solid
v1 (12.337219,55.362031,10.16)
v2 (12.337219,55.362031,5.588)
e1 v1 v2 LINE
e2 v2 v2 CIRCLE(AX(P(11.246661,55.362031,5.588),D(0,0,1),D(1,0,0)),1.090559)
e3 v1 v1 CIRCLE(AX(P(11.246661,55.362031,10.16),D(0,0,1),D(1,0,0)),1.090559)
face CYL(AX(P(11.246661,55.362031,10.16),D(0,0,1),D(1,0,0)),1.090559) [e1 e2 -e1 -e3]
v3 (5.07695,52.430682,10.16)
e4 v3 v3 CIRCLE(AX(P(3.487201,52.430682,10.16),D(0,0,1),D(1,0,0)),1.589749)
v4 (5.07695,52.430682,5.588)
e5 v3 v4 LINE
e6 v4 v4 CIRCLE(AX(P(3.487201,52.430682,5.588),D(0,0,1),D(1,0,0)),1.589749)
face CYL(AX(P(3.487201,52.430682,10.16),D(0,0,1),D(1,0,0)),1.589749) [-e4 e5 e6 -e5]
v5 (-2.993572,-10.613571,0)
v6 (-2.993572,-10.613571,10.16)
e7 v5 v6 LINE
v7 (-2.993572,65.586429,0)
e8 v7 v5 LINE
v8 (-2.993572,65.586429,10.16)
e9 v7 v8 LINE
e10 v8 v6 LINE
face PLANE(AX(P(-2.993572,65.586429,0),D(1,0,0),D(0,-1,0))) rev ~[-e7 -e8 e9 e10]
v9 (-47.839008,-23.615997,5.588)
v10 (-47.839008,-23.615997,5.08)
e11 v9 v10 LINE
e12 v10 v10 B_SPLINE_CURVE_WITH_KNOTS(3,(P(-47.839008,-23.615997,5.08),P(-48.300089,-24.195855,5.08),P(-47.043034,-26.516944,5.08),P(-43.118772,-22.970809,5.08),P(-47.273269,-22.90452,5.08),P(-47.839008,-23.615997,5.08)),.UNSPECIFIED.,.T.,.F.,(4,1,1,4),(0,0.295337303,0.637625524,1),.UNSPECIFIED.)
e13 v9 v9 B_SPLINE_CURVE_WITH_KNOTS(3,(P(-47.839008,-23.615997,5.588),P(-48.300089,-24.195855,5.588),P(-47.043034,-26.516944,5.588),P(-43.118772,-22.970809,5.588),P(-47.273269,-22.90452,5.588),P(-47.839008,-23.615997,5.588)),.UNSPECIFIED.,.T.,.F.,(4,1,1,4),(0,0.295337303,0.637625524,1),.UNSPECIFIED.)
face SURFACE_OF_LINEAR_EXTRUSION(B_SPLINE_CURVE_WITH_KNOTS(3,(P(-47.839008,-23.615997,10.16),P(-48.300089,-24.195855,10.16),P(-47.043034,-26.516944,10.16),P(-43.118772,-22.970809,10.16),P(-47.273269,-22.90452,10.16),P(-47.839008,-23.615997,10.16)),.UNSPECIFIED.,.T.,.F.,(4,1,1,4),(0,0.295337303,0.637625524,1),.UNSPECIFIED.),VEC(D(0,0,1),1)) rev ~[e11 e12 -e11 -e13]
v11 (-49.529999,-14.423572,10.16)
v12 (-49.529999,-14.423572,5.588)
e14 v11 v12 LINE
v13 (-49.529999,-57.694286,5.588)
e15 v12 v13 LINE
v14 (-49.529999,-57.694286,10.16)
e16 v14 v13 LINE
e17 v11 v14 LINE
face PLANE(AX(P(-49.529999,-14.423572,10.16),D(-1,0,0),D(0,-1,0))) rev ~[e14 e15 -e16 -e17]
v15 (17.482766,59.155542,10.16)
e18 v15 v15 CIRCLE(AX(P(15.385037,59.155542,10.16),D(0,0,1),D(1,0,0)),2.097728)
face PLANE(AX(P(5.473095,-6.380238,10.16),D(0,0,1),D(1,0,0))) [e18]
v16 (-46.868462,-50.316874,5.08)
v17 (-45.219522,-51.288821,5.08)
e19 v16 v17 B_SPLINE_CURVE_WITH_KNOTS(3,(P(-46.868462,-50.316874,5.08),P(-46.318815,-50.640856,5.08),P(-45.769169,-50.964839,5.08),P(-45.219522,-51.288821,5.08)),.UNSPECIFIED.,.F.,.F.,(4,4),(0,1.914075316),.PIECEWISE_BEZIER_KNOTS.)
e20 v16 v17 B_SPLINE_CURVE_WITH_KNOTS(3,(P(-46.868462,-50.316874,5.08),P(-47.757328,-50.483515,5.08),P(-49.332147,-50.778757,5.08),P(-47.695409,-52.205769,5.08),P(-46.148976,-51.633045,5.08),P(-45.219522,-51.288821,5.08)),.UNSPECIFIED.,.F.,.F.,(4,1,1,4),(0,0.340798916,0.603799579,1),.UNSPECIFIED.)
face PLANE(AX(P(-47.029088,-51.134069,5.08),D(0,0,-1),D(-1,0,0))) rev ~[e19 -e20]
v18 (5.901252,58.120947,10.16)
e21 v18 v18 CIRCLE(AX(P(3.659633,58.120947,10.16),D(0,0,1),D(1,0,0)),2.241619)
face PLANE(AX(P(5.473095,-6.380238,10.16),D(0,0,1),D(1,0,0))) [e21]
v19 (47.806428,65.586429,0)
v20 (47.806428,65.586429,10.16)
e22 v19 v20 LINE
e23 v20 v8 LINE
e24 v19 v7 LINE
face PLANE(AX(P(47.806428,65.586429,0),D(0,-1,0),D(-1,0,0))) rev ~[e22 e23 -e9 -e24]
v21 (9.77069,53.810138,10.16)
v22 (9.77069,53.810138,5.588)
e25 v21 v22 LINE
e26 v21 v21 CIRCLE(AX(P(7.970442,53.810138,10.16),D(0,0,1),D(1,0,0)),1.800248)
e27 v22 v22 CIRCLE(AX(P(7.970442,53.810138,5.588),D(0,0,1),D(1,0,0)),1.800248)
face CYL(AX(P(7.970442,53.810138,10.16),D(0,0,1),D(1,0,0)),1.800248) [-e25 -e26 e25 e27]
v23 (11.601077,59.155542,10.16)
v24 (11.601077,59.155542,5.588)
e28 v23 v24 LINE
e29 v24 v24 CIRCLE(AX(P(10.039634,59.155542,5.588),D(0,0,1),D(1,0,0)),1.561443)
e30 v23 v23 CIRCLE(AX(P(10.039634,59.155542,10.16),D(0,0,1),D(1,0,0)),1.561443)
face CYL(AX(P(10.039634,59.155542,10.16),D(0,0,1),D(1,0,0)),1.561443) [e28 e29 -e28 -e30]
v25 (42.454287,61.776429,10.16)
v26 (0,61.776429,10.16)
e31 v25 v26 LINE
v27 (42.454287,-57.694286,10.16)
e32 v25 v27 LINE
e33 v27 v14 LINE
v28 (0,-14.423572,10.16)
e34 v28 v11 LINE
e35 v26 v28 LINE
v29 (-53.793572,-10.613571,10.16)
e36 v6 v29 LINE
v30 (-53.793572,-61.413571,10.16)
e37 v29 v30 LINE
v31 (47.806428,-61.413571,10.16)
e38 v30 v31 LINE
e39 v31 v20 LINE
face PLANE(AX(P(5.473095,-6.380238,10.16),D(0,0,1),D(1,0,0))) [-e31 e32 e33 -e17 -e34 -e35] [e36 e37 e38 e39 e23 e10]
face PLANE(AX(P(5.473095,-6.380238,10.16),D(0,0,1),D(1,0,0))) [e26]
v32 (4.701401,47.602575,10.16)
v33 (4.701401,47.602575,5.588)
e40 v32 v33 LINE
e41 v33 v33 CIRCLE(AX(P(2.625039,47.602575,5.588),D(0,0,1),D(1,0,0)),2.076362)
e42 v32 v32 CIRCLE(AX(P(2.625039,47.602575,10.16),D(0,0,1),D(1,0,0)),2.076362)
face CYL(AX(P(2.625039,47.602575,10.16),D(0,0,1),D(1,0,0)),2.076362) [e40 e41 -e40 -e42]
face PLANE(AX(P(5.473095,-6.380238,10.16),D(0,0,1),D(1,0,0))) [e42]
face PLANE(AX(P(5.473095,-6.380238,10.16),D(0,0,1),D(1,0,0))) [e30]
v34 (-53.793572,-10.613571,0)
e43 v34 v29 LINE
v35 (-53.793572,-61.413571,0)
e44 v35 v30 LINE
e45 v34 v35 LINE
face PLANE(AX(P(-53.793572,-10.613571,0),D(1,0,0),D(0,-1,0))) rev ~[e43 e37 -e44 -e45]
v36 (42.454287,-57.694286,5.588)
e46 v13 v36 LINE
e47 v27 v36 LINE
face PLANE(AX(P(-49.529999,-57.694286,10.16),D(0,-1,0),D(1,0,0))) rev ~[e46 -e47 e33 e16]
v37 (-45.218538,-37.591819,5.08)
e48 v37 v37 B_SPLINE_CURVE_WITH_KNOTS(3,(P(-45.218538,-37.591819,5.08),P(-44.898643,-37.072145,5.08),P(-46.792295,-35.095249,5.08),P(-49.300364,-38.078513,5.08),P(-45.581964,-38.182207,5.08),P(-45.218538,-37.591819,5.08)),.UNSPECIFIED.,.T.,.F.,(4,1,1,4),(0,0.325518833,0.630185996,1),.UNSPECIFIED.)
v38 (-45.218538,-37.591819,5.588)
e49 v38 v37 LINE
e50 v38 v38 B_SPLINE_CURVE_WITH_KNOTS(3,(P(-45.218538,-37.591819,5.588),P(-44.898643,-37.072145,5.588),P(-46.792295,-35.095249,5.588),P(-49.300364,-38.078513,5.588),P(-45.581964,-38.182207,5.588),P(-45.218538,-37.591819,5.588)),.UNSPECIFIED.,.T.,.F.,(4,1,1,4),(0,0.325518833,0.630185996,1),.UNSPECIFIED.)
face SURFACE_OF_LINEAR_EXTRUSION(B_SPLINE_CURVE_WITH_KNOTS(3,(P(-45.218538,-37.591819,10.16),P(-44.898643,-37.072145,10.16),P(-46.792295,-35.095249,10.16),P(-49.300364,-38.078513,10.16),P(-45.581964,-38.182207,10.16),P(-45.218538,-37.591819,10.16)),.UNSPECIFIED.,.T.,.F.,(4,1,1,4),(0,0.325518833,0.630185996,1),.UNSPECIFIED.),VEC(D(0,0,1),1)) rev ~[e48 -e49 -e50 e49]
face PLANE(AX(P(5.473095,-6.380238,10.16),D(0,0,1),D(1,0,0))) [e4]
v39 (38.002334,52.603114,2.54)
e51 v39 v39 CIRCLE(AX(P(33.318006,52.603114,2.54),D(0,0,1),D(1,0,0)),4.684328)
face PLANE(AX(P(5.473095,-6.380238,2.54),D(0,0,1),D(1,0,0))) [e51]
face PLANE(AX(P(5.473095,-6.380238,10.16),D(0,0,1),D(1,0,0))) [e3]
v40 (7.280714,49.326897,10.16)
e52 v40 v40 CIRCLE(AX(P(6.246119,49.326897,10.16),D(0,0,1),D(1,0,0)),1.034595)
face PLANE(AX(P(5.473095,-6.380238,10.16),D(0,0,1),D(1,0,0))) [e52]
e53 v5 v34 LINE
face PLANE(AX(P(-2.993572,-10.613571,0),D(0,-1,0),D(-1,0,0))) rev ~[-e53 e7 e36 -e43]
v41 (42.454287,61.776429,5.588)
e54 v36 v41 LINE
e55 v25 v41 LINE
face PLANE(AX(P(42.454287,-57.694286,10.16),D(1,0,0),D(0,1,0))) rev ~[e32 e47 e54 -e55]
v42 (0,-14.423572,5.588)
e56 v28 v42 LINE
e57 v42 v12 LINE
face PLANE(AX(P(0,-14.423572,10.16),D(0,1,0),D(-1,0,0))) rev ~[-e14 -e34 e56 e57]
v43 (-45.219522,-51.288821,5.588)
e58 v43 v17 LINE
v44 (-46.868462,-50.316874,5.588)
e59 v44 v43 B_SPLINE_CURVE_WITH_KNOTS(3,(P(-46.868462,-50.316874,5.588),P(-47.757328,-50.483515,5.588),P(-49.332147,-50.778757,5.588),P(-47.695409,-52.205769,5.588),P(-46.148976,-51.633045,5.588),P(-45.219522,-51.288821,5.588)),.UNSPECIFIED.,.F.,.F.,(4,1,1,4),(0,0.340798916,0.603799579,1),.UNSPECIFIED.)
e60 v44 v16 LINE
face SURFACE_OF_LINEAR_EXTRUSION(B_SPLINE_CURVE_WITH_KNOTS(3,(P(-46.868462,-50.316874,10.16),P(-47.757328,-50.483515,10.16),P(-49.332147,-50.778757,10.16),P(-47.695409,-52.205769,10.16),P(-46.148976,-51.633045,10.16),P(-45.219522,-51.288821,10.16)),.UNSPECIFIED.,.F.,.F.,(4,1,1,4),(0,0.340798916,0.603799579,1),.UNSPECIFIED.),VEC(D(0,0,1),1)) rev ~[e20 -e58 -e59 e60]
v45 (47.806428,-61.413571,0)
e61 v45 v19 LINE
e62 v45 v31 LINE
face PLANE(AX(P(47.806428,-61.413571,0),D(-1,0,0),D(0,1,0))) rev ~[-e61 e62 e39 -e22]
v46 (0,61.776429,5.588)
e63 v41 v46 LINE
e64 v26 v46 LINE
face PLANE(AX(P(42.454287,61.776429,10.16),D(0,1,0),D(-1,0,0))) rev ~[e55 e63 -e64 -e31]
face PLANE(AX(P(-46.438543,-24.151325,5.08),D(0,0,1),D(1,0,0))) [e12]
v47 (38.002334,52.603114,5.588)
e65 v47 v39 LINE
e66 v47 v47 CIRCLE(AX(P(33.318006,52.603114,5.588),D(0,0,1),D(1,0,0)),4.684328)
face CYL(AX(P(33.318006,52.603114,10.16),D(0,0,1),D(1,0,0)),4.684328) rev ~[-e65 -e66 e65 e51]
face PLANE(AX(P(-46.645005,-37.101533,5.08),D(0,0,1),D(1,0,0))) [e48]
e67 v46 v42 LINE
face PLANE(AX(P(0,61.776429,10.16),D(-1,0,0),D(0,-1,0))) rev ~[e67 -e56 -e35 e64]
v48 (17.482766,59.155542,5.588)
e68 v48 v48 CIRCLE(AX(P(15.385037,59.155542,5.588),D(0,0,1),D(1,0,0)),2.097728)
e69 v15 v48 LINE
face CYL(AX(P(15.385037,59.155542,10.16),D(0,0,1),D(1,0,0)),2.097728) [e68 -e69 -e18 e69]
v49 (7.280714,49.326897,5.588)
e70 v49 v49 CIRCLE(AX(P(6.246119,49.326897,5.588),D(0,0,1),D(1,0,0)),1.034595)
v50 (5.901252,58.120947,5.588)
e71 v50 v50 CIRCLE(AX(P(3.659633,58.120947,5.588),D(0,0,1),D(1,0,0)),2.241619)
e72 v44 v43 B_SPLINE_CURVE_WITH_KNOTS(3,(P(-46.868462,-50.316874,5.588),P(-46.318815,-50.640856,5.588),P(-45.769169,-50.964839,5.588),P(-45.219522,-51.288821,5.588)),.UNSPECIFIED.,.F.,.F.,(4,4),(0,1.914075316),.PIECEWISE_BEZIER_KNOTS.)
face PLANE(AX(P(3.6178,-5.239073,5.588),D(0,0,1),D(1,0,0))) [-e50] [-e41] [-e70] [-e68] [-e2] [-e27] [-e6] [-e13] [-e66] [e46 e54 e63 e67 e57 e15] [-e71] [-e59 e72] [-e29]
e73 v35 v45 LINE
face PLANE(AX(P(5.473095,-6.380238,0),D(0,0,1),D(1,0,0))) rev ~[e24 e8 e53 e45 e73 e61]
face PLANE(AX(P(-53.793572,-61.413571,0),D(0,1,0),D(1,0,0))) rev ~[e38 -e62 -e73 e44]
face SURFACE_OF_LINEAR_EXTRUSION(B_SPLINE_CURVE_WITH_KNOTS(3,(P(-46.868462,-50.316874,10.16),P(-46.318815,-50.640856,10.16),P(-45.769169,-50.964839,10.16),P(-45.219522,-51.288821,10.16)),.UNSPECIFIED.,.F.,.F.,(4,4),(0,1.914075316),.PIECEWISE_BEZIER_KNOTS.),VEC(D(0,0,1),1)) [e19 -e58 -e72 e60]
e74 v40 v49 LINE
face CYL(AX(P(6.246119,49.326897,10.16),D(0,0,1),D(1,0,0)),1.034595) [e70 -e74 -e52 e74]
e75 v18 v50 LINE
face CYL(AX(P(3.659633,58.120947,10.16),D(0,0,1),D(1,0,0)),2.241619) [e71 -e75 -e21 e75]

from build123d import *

# Parameters (mm, degrees)
F1_DEPTH = 10.16
F3_DEPTH = 5.08
F2_R     = 2.0763624022
F2_R_2   = 1.0345950723
F2_R_3   = 1.5897491602
F2_R_4   = 2.2416189492
F2_R_5   = 1.8002482779
F2_R_6   = 1.0905586669
F2_R_7   = 1.5614432183
F2_R_8   = 2.0977283719
F2_R_9   = 4.6843284207
F4_DEPTH = 4.572
F5_DEPTH = 7.62
F6_DEPTH = 0.762


# Not quite as in the source:
# - the program builds the solid bodies; features that only make, move or delete a surface that nothing else refers to are left out


with BuildPart() as f1:
    # F0 (on Top) → F1 (new body)
    with BuildSketch(Plane.XY):
        Polygon((47.8064281952, 65.5864290789), (-2.9935718048, 65.5864290789), (-2.9935718048, -10.6135709211), (-53.7935718048, -10.6135709211), (-53.7935718048, -61.4135709211), (47.8064281952, -61.4135709211), align=None)
    extrude(amount=F1_DEPTH)

    # F2 (on face) → F3 (cut)
    with BuildSketch(Plane.XY.offset(10.16)):
        with BuildLine():
            add(Edge.make_bspline(
                [(-47.8390082717, -23.6159972847), (-48.3000888755, -24.195855305), (-47.0430336613, -26.5169441972), (-43.1187716407, -22.9708090315), (-47.273269231, -22.904520121), (-47.8390082717, -23.6159972847)],
                knots=[0, 0, 0, 0, 0.2953373029, 0.6376255235, 1, 1, 1, 1], degree=3))
        make_face()
        with BuildLine():
            add(Edge.make_bspline(
                [(-45.2185384929, -37.5918187201), (-44.8986430919, -37.0721449164), (-46.7922945126, -35.0952494412), (-49.3003635487, -38.0785129033), (-45.5819638525, -38.1822074482), (-45.2185384929, -37.5918187201)],
                knots=[0, 0, 0, 0, 0.3255188332, 0.6301859964, 1, 1, 1, 1], degree=3))
        make_face()
        with BuildLine():
            add(Edge.make_bspline(
                [(-46.8684621155, -50.3168739378), (-46.3188154002, -50.6408562263), (-45.7691686849, -50.9648385147), (-45.2195219696, -51.2888208032)],
                knots=[0, 0, 0, 0, 1.9140753157, 1.9140753157, 1.9140753157, 1.9140753157], degree=3))
            add(Edge.make_bspline(
                [(-46.8684621155, -50.3168739378), (-47.7573276365, -50.4835154275), (-49.3321466932, -50.7787571568), (-47.6954089883, -52.20576886), (-46.1489762809, -51.633045446), (-45.2195219696, -51.2888208032)],
                knots=[0, 0, 0, 0, 0.340798916, 0.6037995791, 1, 1, 1, 1], degree=3))
        make_face()
    extrude(amount=-F3_DEPTH, mode=Mode.SUBTRACT)

    # F2 (on face) → F4 (cut)
    with BuildSketch(Plane.XY.offset(10.16)):
        with BuildLine():
            Line((0, -14.423571527), (-49.5299994946, -14.423571527))
            Line((-49.5299994946, -14.423571527), (-49.5299994946, -57.694286108))
            Line((-49.5299994946, -57.694286108), (12.2464280576, -57.694286108))
            add(Edge.make_bspline(
                [(12.2464280576, -57.694286108), (11.03689249, -55.1284041984), (8.8262402555, -50.4387756091), (16.830567108, -50.610538154), (11.543684395, -41.4140537661), (24.3541608342, -47.2929208414), (18.6630964396, -34.0142041282), (32.3027129745, -41.5037229838), (28.8060301659, -27.219324679), (39.7417437225, -32.4995208739), (41.581315462, -27.9924233376), (42.4542874098, -25.8535724133)],
                knots=[0, 0, 0, 0, 0.1112734122, 0.2033729508, 0.3034169687, 0.4180959772, 0.5306525521, 0.6520560864, 0.7731880867, 0.8923660146, 1, 1, 1, 1], degree=3))
            Line((42.4542874098, -25.8535724133), (42.4542874098, 61.7764294147))
            Line((42.4542874098, 61.7764294147), (0, 61.7764294147))
            Line((0, 61.7764294147), (0, -14.423571527))
        make_face()
        with BuildLine():
            add(Edge.make_bspline(
                [(-46.8684621155, -50.3168739378), (-47.7573276365, -50.4835154275), (-49.3321466932, -50.7787571568), (-47.6954089883, -52.20576886), (-46.1489762809, -51.633045446), (-45.2195219696, -51.2888208032)],
                knots=[0, 0, 0, 0, 0.340798916, 0.6037995791, 1, 1, 1, 1], degree=3))
            add(Edge.make_bspline(
                [(-46.8684621155, -50.3168739378), (-46.3188154002, -50.6408562263), (-45.7691686849, -50.9648385147), (-45.2195219696, -51.2888208032)],
                knots=[0, 0, 0, 0, 1.9140753157, 1.9140753157, 1.9140753157, 1.9140753157], degree=3))
        make_face(mode=Mode.SUBTRACT)
        with BuildLine():
            add(Edge.make_bspline(
                [(-45.2185384929, -37.5918187201), (-44.8986430919, -37.0721449164), (-46.7922945126, -35.0952494412), (-49.3003635487, -38.0785129033), (-45.5819638525, -38.1822074482), (-45.2185384929, -37.5918187201)],
                knots=[0, 0, 0, 0, 0.3255188332, 0.6301859964, 1, 1, 1, 1], degree=3))
        make_face(mode=Mode.SUBTRACT)
        with BuildLine():
            add(Edge.make_bspline(
                [(-47.8390082717, -23.6159972847), (-48.3000888755, -24.195855305), (-47.0430336613, -26.5169441972), (-43.1187716407, -22.9708090315), (-47.273269231, -22.904520121), (-47.8390082717, -23.6159972847)],
                knots=[0, 0, 0, 0, 0.2953373029, 0.6376255235, 1, 1, 1, 1], degree=3))
        make_face(mode=Mode.SUBTRACT)
        with Locations((2.6250390802, 47.6025752723)):
            Circle(F2_R, mode=Mode.SUBTRACT)
        with Locations((6.2461188063, 49.3268966675)):
            Circle(F2_R_2, mode=Mode.SUBTRACT)
        with Locations((3.4872009419, 52.4306818843)):
            Circle(F2_R_3, mode=Mode.SUBTRACT)
        with Locations((3.6596332211, 58.1209473312)):
            Circle(F2_R_4, mode=Mode.SUBTRACT)
        with Locations((7.9704420641, 53.8101382554)):
            Circle(F2_R_5, mode=Mode.SUBTRACT)
        with Locations((11.2466607243, 55.3620308638)):
            Circle(F2_R_6, mode=Mode.SUBTRACT)
        with Locations((10.0396340713, 59.1555424035)):
            Circle(F2_R_7, mode=Mode.SUBTRACT)
        with Locations((15.3850372881, 59.1555424035)):
            Circle(F2_R_8, mode=Mode.SUBTRACT)
        with Locations((33.3180055022, 52.6031143963)):
            Circle(F2_R_9, mode=Mode.SUBTRACT)
        with BuildLine():
            add(Edge.make_bspline(
                [(12.2464280576, -57.694286108), (11.03689249, -55.1284041984), (8.8262402555, -50.4387756091), (16.830567108, -50.610538154), (11.543684395, -41.4140537661), (24.3541608342, -47.2929208414), (18.6630964396, -34.0142041282), (32.3027129745, -41.5037229838), (28.8060301659, -27.219324679), (39.7417437225, -32.4995208739), (41.581315462, -27.9924233376), (42.4542874098, -25.8535724133)],
                knots=[0, 0, 0, 0, 0.1112734122, 0.2033729508, 0.3034169687, 0.4180959772, 0.5306525521, 0.6520560864, 0.7731880867, 0.8923660146, 1, 1, 1, 1], degree=3))
            Line((12.2464280576, -57.694286108), (42.4542874098, -57.694286108))
            Line((42.4542874098, -57.694286108), (42.4542874098, -25.8535724133))
        make_face()
    extrude(amount=-F4_DEPTH, mode=Mode.SUBTRACT)

    # F5 (cut): a face of the model
    f5_faces = [f1.faces().sort_by_distance(p)[0] for p in [
        (33.3180055022, 52.6031143963, 10.16),
    ]]
    extrude(f5_faces, amount=-F5_DEPTH, mode=Mode.SUBTRACT)

    # F2 (on face) → F6 (cut)
    with BuildSketch(Plane.XY.offset(10.16)):
        with BuildLine():
            add(Edge.make_bspline(
                [(12.2464280576, -57.694286108), (11.03689249, -55.1284041984), (8.8262402555, -50.4387756091), (16.830567108, -50.610538154), (11.543684395, -41.4140537661), (24.3541608342, -47.2929208414), (18.6630964396, -34.0142041282), (32.3027129745, -41.5037229838), (28.8060301659, -27.219324679), (39.7417437225, -32.4995208739), (41.581315462, -27.9924233376), (42.4542874098, -25.8535724133)],
                knots=[0, 0, 0, 0, 0.1112734122, 0.2033729508, 0.3034169687, 0.4180959772, 0.5306525521, 0.6520560864, 0.7731880867, 0.8923660146, 1, 1, 1, 1], degree=3))
            Line((12.2464280576, -57.694286108), (42.4542874098, -57.694286108))
            Line((42.4542874098, -57.694286108), (42.4542874098, -25.8535724133))
        make_face()
    extrude(amount=-F6_DEPTH, mode=Mode.SUBTRACT)


solid = f1.part
